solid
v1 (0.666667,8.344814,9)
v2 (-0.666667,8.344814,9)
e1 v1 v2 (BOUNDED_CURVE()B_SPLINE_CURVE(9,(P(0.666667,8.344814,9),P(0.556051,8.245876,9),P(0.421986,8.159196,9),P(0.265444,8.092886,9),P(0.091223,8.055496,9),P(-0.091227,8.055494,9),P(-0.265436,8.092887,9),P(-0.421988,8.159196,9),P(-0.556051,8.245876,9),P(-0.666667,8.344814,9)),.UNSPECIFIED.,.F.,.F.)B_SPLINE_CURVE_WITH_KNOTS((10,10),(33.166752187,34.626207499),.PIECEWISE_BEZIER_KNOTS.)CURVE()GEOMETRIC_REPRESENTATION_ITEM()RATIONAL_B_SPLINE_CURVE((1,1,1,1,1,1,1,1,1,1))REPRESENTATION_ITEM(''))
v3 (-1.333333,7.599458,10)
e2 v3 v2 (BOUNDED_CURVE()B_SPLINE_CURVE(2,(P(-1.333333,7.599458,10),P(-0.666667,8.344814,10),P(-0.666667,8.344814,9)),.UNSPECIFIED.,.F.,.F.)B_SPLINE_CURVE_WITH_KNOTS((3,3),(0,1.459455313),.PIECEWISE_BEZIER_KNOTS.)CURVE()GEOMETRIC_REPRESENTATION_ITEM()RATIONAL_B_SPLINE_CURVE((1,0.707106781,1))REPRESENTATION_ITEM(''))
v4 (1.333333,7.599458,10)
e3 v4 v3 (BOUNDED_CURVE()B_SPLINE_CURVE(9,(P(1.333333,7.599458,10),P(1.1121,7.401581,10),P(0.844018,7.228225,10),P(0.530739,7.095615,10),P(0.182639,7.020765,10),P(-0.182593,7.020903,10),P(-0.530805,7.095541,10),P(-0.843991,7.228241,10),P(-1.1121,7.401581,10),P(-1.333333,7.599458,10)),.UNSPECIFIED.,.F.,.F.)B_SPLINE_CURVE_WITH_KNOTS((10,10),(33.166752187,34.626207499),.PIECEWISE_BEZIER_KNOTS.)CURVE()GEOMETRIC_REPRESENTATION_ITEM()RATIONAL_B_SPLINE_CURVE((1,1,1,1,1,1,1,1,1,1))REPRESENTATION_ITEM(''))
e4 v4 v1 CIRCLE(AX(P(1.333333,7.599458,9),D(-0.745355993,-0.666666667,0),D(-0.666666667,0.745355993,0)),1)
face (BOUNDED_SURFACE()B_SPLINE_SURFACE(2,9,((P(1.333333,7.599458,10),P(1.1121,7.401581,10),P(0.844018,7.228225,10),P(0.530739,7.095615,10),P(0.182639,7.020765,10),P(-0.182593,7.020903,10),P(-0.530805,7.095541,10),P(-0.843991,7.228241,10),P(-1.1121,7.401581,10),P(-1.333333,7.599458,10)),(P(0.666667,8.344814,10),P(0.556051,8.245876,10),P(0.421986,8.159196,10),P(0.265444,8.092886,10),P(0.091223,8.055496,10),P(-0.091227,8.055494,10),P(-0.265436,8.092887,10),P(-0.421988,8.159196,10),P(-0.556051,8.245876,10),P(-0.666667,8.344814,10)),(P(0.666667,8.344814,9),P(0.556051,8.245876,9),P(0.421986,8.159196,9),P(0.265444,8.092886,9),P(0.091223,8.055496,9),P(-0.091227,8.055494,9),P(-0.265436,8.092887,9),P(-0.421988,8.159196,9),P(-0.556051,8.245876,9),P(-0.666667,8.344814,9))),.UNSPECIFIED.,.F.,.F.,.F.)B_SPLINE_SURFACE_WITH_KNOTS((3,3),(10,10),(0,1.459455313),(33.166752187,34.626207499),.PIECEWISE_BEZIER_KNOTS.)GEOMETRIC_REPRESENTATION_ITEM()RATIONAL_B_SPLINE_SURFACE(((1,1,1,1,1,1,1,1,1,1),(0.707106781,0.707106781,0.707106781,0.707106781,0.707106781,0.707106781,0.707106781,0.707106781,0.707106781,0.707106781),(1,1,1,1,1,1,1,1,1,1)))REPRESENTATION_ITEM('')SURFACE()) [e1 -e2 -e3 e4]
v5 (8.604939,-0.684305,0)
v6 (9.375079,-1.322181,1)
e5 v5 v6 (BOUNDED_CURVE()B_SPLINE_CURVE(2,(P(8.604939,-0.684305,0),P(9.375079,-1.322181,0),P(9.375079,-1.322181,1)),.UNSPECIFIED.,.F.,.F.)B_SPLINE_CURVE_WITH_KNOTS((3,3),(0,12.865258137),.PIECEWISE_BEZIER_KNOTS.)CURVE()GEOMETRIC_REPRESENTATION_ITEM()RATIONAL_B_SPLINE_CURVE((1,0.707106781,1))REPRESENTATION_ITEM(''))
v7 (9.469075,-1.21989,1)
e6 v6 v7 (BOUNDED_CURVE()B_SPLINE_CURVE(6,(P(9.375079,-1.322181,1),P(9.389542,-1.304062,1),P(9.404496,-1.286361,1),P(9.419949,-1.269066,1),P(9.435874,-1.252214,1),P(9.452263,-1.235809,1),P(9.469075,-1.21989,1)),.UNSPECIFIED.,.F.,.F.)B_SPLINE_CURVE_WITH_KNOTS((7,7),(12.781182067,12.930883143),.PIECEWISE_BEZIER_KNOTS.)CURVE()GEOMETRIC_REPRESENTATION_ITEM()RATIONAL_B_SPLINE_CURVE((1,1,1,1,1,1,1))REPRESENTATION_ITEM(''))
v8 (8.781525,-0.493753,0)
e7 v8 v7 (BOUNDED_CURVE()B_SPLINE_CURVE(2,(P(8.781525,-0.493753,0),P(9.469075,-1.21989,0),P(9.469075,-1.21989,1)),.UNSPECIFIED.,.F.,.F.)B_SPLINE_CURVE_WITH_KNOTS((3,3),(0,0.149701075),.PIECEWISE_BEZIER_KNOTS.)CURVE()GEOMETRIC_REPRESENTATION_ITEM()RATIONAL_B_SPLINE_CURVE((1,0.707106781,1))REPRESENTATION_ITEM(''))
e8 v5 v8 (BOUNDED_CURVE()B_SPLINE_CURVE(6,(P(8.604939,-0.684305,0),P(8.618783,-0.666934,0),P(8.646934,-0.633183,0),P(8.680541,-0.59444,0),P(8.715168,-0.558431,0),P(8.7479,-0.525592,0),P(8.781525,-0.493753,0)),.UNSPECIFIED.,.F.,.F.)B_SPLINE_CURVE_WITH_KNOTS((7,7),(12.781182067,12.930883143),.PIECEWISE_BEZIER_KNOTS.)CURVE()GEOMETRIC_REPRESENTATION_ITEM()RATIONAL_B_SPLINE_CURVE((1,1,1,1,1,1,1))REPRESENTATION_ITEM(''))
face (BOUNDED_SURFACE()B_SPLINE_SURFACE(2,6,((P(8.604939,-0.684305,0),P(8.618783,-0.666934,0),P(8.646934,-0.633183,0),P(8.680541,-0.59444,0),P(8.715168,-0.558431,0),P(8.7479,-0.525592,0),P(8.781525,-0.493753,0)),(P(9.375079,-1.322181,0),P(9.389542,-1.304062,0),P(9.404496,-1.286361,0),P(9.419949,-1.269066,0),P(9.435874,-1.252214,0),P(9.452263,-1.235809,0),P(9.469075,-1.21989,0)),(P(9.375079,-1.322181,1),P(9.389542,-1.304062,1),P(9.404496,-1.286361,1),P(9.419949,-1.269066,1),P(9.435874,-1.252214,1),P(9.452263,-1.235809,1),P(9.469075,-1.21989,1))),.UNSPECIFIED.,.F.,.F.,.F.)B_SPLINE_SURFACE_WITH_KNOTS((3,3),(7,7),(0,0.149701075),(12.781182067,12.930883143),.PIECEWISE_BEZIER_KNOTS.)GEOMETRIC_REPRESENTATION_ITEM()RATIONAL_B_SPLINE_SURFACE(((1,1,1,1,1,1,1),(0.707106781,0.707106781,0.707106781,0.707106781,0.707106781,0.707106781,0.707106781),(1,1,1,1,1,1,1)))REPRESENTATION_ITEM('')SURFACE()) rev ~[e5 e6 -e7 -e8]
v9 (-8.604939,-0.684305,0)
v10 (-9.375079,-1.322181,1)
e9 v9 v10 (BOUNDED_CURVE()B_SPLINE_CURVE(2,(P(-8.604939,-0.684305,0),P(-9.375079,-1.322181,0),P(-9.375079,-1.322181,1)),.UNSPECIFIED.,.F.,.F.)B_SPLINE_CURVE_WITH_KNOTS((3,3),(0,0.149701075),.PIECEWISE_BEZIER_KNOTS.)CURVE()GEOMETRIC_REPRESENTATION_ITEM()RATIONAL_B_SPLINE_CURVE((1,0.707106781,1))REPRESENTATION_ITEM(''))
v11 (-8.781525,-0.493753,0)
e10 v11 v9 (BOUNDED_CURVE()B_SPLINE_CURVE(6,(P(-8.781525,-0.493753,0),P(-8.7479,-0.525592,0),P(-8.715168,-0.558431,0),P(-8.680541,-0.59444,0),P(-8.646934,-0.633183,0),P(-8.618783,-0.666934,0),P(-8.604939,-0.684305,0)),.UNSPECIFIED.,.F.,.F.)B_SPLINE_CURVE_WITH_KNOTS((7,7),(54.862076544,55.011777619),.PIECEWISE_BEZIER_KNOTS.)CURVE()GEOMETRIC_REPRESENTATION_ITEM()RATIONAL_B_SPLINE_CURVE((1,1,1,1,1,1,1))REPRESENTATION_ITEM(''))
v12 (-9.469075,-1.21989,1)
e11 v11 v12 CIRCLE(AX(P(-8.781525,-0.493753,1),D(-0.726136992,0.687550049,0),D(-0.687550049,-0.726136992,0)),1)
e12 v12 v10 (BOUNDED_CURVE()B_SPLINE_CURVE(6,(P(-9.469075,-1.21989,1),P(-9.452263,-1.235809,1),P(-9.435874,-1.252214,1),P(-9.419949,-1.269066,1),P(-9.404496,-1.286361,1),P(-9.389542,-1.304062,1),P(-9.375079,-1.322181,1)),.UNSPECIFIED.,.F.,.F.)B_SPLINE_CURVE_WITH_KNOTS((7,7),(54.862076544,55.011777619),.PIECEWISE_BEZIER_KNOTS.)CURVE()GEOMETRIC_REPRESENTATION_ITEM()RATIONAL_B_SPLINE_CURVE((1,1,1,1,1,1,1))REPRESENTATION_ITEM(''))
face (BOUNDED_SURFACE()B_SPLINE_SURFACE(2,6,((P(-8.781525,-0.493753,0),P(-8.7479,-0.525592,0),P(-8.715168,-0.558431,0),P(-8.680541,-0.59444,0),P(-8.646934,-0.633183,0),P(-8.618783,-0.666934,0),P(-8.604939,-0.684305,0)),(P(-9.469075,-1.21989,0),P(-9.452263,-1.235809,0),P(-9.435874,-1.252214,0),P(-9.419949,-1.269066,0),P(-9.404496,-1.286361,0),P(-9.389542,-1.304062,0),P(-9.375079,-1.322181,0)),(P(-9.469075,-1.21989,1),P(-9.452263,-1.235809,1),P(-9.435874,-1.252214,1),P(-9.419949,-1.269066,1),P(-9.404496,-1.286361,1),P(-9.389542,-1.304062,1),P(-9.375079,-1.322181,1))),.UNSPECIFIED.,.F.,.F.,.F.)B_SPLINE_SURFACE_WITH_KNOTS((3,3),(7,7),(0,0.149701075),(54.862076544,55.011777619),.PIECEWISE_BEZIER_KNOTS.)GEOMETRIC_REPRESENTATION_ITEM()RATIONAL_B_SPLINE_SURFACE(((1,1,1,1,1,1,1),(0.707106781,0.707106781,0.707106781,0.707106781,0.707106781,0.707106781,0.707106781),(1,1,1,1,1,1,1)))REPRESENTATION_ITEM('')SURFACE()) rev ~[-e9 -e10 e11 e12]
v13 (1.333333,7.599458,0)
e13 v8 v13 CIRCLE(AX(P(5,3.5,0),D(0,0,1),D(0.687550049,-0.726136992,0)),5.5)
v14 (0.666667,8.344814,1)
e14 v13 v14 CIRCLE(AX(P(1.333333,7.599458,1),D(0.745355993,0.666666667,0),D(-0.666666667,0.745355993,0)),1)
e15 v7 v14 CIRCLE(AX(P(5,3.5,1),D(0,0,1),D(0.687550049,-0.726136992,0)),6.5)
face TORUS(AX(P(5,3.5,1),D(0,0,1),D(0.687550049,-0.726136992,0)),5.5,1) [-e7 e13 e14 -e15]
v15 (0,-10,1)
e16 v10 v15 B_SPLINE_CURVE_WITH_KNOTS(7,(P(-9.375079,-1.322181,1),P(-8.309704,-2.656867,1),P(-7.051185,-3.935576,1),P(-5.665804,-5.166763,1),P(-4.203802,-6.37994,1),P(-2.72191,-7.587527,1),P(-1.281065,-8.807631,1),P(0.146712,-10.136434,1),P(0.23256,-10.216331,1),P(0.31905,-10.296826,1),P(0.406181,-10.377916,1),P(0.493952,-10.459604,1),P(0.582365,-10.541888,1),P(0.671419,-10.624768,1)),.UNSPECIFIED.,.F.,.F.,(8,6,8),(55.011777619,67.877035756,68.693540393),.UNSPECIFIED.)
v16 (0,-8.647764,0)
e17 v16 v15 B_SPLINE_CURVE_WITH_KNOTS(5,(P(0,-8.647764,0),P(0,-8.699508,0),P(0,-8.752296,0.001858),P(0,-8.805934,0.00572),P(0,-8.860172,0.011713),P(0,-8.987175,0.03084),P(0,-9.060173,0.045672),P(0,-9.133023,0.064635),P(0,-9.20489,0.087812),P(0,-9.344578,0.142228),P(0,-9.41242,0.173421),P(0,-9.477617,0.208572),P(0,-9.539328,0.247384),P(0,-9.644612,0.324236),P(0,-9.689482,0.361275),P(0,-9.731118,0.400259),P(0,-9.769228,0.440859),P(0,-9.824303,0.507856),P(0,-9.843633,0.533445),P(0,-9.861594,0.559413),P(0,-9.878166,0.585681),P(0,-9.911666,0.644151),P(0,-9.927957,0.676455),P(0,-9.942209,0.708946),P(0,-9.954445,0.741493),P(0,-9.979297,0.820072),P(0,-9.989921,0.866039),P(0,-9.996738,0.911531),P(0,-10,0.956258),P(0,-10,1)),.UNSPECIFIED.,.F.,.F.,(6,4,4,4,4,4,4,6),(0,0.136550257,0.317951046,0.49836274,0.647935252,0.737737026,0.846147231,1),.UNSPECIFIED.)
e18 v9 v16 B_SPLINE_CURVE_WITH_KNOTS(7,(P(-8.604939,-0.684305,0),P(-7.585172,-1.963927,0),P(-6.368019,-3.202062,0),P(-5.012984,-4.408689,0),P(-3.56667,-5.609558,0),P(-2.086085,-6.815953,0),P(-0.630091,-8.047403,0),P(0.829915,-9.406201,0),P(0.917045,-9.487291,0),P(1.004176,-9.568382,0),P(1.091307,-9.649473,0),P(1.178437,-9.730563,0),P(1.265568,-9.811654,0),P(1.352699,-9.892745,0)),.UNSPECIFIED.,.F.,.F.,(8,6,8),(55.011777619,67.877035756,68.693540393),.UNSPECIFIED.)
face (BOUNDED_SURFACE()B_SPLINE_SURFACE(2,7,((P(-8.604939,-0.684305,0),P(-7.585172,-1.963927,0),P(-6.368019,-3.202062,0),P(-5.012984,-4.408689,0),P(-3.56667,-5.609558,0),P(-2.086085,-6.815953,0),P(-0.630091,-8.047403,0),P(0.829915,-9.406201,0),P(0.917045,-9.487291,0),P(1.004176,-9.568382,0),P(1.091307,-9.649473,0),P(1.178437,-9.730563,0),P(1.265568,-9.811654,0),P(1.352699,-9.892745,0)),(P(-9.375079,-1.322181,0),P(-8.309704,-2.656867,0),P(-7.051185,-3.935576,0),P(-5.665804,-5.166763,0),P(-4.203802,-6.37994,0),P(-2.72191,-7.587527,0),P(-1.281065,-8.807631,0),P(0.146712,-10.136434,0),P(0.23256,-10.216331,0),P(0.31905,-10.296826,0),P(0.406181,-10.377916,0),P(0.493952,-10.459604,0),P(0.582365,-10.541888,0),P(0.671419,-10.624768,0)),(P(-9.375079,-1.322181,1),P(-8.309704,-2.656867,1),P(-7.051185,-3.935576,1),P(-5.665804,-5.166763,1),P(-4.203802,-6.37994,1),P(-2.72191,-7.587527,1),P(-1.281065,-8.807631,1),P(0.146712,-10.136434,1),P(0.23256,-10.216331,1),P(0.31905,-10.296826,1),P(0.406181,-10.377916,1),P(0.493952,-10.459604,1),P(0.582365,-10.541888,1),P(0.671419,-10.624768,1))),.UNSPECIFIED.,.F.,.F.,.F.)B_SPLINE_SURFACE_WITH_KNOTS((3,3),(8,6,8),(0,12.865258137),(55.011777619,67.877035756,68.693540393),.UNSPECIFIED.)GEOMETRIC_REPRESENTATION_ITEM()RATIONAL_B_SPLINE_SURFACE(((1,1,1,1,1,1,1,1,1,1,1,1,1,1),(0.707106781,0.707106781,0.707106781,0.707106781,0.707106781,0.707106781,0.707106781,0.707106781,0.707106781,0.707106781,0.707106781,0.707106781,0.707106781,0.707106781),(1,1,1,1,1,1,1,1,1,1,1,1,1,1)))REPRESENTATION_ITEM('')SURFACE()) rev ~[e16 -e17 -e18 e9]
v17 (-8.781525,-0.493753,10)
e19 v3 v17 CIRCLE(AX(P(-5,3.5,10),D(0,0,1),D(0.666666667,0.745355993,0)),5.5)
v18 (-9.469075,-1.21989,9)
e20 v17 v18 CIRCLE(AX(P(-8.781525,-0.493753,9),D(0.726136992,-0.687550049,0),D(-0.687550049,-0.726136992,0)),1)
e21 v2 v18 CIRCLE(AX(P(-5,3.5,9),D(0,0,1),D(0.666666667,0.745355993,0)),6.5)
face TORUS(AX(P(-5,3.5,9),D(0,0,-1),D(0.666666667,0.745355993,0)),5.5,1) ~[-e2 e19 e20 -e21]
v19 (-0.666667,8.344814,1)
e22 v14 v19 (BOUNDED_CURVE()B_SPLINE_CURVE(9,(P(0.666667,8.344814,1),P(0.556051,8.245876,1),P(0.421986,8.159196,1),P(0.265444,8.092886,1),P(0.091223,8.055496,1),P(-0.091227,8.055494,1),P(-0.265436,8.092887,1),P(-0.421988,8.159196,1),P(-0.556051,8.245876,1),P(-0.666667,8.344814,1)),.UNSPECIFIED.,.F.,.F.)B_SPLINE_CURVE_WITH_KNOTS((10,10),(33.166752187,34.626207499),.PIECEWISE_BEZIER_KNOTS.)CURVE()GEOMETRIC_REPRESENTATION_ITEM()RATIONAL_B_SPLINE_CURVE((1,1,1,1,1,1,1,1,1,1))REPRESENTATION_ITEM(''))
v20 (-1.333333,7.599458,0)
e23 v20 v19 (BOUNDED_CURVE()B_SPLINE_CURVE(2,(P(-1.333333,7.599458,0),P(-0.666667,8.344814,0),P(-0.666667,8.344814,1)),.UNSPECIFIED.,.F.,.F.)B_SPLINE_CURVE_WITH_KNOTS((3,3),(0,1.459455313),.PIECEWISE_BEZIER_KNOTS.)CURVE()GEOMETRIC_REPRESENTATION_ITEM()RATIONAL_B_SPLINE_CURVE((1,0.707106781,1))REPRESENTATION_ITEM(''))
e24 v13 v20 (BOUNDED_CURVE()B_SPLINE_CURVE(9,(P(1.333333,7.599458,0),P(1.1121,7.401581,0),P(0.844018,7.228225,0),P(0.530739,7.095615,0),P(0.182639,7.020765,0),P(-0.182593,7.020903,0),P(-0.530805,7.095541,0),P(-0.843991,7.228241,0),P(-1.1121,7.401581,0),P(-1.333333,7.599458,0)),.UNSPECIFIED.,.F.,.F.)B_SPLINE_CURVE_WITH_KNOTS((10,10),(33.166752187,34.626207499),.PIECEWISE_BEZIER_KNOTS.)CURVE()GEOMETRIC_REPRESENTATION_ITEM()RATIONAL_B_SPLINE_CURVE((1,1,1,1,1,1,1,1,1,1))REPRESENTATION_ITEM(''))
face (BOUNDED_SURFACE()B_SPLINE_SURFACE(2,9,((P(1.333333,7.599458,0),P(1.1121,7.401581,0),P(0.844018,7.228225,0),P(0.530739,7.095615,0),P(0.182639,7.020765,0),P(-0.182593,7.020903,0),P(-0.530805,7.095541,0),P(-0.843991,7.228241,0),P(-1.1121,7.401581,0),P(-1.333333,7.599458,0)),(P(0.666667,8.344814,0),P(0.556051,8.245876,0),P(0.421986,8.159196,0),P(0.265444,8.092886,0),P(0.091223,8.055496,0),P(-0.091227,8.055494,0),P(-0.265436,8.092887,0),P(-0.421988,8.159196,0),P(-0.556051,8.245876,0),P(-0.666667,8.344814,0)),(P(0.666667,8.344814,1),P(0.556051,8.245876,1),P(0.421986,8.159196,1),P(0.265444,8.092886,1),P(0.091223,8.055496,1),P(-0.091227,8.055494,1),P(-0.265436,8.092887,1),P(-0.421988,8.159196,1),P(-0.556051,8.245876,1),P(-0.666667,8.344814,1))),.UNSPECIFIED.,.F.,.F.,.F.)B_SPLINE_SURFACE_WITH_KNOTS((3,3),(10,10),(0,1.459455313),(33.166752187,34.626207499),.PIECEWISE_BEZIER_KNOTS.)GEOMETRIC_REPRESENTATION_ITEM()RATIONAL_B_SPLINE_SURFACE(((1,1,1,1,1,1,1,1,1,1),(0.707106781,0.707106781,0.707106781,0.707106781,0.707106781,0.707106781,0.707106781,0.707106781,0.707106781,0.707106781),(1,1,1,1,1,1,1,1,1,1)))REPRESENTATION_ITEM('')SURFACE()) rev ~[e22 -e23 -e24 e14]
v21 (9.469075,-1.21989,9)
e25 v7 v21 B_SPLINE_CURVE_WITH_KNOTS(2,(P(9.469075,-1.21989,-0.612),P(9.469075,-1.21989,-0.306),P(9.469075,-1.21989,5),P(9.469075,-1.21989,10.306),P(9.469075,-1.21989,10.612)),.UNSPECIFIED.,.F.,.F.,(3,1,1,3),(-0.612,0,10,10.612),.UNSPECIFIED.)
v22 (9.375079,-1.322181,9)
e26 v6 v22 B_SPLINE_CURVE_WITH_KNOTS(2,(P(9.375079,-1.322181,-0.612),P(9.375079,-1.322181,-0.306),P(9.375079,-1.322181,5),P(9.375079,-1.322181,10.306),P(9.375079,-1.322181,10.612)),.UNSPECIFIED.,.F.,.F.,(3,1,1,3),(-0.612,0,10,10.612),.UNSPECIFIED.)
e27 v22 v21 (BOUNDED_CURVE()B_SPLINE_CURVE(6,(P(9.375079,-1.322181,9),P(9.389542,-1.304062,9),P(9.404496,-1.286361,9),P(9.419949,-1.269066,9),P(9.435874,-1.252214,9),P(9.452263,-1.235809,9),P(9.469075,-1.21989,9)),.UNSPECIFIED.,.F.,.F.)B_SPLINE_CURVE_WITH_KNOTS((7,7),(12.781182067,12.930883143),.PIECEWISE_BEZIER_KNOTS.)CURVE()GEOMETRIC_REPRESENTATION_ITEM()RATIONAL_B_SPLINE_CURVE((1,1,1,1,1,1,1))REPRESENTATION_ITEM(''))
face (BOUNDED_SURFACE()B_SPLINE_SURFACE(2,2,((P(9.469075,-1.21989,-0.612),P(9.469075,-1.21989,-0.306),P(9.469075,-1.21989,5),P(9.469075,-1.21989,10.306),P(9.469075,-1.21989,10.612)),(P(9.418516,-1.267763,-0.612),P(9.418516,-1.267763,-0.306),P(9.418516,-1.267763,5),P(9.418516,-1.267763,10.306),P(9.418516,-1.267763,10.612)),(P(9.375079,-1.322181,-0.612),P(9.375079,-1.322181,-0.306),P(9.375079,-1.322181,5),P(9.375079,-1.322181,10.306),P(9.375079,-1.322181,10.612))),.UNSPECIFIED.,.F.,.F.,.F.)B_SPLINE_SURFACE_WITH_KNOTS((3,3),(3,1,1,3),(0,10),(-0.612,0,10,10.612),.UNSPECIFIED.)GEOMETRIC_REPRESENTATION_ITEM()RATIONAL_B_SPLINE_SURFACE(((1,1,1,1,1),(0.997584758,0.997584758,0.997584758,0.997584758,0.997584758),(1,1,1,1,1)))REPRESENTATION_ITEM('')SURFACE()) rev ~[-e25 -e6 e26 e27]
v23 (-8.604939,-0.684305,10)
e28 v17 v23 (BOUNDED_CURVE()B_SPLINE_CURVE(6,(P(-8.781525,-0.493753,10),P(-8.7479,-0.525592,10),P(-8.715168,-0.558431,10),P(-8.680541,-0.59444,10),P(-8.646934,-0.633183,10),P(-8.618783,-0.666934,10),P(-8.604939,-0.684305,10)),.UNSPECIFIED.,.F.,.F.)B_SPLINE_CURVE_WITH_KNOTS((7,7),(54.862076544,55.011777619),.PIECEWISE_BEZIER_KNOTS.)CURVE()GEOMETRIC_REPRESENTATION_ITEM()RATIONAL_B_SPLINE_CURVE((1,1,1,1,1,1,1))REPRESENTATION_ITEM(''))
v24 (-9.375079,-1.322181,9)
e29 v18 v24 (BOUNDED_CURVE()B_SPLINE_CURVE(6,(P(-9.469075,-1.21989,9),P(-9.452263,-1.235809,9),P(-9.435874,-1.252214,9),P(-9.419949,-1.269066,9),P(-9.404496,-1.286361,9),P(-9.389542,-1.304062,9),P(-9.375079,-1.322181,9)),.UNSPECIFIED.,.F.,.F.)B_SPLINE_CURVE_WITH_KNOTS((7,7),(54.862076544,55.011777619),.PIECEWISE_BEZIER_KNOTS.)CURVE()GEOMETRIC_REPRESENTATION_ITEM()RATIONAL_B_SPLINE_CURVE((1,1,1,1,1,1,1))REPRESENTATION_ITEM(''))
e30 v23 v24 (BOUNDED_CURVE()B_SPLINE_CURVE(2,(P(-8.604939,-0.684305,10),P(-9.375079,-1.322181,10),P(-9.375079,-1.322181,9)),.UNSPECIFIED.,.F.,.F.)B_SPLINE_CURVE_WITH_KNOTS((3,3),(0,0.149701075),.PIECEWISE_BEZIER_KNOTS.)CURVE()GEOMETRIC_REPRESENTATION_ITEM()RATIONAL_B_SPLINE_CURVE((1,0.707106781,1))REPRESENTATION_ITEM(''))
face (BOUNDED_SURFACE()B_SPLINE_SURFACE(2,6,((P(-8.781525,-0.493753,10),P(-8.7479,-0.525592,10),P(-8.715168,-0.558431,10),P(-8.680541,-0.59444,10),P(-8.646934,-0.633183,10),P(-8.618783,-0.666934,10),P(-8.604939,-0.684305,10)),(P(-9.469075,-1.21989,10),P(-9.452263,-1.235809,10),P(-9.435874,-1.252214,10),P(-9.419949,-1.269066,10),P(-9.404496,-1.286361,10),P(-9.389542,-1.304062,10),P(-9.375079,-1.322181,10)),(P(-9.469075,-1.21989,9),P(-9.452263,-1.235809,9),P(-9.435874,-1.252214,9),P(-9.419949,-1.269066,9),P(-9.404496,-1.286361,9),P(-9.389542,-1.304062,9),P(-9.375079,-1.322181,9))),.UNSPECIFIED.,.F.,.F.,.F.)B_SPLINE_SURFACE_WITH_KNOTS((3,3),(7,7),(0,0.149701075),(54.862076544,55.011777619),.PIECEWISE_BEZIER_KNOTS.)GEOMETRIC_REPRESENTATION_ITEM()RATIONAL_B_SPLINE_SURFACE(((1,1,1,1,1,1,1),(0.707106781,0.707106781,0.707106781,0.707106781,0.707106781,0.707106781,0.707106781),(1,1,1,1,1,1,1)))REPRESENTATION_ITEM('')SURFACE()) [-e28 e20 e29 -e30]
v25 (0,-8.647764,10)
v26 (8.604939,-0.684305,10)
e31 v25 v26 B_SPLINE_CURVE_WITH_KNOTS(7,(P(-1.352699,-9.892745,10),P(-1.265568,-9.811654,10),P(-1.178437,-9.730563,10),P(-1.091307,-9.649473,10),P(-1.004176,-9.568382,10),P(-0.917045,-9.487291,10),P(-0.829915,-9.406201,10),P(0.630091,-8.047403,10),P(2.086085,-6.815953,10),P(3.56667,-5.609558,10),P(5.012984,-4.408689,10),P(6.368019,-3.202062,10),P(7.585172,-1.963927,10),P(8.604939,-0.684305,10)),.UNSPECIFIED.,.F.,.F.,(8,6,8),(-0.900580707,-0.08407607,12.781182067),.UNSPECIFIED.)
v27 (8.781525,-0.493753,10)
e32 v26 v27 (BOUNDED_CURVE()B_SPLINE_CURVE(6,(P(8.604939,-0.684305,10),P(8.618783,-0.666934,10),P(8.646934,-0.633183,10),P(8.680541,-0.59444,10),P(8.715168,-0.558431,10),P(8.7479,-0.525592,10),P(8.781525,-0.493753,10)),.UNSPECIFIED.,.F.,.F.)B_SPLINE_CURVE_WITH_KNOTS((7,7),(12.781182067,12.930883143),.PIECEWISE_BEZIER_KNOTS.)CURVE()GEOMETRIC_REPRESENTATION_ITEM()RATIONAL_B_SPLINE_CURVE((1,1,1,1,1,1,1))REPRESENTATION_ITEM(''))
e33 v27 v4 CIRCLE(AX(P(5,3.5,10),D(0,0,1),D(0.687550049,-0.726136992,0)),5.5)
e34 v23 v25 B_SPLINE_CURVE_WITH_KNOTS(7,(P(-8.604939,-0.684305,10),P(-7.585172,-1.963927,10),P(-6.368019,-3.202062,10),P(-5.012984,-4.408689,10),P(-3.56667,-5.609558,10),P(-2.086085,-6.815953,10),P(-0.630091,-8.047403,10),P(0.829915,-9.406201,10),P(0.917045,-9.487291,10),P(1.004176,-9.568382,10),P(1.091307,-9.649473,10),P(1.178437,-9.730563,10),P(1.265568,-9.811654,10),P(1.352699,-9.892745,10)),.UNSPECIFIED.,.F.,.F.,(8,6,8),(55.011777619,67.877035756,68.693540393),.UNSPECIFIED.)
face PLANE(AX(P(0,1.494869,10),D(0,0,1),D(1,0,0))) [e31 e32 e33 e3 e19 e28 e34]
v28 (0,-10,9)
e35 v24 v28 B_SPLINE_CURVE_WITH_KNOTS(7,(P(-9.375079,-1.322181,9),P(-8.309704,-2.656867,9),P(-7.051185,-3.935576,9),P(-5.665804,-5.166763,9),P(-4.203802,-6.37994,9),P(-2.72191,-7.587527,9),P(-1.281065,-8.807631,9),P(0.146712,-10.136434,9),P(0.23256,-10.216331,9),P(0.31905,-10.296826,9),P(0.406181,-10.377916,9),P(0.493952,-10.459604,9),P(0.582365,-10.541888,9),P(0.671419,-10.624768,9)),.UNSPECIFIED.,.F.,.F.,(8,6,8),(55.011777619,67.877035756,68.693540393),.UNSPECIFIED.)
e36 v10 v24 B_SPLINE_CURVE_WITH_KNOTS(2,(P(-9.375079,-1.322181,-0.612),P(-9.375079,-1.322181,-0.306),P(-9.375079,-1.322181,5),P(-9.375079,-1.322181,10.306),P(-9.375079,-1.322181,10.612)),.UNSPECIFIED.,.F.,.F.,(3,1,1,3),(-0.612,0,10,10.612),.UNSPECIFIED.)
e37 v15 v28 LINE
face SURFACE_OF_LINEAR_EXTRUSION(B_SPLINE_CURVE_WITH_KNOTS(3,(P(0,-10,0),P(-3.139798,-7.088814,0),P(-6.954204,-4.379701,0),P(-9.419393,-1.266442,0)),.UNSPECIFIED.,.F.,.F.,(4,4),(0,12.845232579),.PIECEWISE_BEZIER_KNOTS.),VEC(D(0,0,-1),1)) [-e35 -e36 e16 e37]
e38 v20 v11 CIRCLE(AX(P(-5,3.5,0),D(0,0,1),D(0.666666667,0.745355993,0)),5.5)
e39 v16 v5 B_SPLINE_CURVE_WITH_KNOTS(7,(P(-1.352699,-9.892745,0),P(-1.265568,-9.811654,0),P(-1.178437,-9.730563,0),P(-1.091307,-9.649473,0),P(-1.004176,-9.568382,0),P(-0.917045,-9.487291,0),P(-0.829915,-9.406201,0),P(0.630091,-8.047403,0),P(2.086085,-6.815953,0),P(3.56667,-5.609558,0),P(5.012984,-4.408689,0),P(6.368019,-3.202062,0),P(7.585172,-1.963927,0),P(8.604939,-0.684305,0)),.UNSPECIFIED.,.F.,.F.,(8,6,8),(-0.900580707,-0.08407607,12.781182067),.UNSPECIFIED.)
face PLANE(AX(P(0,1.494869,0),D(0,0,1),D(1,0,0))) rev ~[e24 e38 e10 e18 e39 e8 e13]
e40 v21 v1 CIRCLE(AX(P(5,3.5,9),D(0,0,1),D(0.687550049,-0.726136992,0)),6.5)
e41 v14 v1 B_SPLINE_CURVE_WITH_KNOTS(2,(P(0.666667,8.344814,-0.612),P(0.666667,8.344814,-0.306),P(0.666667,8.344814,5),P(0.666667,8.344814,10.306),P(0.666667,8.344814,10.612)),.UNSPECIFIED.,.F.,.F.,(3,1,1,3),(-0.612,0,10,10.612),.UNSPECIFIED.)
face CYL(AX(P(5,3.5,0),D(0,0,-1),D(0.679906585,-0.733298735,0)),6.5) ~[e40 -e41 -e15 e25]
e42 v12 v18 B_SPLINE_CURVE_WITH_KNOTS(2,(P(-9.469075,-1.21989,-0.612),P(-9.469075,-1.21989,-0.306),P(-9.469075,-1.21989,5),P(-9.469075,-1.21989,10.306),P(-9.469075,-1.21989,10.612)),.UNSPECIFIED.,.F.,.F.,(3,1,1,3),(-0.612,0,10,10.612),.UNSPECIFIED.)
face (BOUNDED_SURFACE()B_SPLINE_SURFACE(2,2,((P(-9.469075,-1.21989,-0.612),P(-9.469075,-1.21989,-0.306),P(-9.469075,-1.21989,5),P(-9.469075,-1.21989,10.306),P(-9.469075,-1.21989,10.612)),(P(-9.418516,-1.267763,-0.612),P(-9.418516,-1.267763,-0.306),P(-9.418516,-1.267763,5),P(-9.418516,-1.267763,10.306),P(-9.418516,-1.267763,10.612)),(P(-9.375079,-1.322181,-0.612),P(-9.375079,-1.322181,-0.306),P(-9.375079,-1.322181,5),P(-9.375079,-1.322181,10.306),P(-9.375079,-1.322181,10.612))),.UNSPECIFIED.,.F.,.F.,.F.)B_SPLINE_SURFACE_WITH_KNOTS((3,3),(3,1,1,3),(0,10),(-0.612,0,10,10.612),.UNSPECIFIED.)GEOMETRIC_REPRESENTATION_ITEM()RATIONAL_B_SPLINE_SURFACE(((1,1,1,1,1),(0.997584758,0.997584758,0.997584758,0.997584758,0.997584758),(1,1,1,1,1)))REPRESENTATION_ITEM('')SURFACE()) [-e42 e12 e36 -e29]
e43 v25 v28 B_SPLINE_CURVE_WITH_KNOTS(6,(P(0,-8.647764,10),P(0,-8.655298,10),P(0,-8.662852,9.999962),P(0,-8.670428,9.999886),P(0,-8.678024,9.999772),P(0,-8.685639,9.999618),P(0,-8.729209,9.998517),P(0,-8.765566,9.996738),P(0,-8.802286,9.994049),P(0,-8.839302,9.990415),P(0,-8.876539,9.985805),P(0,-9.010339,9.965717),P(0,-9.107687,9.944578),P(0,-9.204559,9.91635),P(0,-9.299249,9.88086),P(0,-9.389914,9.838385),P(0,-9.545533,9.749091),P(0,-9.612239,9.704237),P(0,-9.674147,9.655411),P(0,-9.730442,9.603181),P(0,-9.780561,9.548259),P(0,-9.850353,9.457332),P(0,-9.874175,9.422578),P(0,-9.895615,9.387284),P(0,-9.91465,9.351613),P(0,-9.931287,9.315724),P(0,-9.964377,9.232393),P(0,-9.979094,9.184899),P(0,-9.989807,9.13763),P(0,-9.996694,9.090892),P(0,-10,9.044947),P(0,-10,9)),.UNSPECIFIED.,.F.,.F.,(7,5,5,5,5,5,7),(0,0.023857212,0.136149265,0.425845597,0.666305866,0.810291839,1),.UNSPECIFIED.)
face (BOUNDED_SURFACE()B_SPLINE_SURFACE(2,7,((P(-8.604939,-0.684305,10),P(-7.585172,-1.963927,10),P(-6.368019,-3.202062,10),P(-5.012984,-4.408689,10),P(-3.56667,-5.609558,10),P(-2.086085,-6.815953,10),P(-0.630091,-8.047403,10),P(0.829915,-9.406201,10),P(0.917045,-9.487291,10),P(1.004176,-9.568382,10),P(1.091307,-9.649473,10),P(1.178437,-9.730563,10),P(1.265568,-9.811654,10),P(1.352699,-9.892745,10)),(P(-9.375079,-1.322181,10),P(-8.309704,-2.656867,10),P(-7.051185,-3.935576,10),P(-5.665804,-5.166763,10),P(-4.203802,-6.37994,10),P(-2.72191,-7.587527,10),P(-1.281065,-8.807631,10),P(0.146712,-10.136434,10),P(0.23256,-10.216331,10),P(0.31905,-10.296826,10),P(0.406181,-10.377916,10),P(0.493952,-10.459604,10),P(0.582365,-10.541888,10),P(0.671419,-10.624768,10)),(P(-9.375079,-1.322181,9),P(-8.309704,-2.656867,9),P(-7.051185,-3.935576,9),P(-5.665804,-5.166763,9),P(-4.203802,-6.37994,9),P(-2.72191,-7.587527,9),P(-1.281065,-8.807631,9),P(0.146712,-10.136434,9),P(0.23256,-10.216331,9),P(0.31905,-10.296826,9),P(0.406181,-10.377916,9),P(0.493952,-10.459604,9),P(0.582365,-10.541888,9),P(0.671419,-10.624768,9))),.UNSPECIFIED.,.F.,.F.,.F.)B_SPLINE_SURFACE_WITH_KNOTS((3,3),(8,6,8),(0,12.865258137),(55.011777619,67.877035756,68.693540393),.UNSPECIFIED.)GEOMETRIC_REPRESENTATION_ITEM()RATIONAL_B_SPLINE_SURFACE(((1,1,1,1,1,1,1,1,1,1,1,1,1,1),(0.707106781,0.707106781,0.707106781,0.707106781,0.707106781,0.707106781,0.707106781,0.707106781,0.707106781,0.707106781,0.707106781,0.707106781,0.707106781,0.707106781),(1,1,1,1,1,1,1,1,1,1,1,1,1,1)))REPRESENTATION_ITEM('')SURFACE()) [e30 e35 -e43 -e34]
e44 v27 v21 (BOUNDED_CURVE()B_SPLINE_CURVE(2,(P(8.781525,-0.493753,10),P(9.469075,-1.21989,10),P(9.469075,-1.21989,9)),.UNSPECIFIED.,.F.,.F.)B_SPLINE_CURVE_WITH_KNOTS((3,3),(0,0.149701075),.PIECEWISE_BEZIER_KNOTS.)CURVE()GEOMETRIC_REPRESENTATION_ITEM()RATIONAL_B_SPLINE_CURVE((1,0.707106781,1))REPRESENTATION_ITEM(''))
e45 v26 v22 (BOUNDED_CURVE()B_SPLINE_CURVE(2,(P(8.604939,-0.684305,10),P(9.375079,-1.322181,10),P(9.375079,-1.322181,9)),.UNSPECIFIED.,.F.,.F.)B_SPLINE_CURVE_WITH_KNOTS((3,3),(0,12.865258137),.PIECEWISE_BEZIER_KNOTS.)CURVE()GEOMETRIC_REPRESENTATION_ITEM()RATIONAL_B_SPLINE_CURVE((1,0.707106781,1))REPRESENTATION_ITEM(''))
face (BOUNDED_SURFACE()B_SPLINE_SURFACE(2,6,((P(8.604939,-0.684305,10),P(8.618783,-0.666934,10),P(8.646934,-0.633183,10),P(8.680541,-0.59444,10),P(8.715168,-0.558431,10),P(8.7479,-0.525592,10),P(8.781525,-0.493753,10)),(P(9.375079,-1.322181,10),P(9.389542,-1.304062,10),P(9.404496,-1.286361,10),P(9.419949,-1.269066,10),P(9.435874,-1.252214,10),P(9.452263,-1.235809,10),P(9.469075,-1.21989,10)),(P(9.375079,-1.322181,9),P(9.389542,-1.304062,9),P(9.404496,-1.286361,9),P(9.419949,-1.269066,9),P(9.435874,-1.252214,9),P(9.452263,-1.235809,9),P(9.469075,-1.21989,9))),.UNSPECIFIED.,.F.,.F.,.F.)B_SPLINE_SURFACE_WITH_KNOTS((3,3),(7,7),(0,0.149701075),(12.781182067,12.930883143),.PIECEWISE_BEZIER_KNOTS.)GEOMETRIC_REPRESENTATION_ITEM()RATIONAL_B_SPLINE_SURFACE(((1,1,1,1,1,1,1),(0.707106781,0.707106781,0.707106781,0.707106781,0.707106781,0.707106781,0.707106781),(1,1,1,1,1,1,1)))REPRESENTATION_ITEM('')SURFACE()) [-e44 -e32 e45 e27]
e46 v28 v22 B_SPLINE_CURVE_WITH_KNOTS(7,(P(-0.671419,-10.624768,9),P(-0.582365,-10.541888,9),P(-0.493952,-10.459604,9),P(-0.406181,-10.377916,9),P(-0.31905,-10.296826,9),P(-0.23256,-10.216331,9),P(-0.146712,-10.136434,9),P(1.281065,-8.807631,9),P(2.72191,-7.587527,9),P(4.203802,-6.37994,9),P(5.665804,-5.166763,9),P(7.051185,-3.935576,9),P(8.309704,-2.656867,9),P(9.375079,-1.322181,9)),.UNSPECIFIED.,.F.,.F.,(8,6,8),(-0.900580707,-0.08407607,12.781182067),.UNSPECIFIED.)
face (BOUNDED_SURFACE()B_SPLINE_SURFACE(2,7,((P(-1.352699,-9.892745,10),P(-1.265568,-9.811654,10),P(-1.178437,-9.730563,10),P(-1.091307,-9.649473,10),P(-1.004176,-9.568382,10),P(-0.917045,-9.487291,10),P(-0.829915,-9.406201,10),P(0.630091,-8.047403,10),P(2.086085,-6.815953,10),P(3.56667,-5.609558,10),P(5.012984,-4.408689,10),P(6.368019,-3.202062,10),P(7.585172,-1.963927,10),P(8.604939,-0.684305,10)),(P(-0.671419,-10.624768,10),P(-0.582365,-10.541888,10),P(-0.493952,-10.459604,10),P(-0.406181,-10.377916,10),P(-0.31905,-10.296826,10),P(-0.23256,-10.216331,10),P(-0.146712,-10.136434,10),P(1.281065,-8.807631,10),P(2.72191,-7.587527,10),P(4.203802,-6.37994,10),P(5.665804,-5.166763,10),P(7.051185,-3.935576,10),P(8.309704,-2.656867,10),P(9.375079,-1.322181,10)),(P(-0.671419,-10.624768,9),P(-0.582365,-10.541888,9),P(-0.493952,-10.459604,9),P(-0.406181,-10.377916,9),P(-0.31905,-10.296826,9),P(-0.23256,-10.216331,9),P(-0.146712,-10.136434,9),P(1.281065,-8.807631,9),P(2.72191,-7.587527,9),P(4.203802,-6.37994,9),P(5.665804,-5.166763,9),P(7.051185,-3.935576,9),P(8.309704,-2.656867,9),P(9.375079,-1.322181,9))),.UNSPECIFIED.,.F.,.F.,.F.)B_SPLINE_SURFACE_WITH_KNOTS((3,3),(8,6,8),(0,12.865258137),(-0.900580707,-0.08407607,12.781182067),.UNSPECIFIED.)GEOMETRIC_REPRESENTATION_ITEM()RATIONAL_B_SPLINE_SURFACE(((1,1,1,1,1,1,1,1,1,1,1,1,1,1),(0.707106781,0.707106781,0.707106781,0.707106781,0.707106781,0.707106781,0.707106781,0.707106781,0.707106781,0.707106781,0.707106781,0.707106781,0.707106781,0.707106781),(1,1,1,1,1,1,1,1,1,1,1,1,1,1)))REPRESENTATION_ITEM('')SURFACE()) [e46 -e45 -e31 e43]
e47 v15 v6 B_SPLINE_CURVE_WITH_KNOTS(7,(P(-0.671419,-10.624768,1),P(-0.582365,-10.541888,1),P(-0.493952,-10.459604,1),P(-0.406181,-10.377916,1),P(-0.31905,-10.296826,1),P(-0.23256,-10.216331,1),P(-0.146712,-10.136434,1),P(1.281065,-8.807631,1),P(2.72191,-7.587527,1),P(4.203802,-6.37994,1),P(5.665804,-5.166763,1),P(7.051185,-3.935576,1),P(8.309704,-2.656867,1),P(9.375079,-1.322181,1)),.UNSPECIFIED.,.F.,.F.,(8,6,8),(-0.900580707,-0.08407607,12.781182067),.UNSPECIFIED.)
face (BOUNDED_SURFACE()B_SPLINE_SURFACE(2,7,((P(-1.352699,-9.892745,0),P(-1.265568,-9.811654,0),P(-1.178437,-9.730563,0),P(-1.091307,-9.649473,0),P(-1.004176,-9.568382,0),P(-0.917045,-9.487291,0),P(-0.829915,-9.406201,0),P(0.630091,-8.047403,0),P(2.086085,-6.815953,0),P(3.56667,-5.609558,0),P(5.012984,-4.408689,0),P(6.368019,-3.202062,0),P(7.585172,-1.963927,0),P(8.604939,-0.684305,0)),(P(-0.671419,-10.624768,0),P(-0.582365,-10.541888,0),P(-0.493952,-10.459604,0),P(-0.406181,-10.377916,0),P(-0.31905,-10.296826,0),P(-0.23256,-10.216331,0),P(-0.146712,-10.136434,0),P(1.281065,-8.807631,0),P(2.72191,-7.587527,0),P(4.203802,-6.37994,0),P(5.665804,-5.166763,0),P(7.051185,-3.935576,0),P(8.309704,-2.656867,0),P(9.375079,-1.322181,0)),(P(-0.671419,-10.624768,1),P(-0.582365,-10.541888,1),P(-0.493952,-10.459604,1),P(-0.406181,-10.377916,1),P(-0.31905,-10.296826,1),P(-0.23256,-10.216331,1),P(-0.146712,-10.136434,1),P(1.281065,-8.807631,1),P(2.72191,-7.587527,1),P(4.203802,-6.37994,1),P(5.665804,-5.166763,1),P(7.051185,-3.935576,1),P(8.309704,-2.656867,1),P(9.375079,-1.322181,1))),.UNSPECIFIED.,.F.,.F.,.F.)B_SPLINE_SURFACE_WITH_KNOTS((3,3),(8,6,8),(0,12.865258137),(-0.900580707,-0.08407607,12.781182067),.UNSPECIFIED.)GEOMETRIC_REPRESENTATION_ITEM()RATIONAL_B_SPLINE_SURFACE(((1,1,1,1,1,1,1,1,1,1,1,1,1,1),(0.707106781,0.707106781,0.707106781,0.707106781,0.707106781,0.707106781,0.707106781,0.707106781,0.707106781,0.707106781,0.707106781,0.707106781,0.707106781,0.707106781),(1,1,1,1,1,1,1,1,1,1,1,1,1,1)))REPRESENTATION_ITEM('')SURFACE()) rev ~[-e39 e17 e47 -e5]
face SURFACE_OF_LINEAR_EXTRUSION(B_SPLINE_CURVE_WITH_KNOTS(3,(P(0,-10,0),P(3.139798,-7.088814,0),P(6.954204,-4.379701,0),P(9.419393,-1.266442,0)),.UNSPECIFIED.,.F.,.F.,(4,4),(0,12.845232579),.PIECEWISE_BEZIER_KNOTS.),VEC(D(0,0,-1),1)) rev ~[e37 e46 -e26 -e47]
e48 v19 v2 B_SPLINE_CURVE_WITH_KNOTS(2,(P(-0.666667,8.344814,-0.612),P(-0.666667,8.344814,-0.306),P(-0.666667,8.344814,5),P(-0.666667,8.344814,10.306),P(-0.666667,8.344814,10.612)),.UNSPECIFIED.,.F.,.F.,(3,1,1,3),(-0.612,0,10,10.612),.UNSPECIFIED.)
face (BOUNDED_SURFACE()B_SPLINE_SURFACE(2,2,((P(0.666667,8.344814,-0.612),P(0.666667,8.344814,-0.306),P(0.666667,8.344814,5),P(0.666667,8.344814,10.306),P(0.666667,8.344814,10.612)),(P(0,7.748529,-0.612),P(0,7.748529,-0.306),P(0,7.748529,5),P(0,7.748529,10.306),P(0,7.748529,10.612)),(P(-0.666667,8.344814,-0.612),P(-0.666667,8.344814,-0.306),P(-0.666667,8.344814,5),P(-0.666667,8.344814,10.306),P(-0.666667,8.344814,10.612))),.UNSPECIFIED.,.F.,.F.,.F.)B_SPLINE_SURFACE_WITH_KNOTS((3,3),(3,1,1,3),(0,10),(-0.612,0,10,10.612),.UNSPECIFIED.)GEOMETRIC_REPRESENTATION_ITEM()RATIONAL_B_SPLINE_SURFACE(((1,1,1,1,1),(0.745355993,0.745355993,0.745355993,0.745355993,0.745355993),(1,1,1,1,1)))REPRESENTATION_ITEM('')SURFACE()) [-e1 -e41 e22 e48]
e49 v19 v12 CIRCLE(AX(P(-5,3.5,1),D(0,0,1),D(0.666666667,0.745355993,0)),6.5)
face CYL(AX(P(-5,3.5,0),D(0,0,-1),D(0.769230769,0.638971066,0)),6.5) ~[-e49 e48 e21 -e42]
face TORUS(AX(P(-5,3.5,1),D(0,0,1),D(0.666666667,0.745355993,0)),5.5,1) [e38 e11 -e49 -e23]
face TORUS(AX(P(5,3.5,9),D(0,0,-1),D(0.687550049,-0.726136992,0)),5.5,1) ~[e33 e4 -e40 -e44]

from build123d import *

# Parameters (mm, degrees)
F1_DEPTH = 10
F2_F1_R  = 1
F2_F2_R  = 1


with BuildPart() as f1:
    # F0 (on Top) → F1 (new body)
    with BuildSketch(Plane.XY):
        with BuildLine():
            ThreePointArc((9.4193928047, -1.2664417795), (9.4693151315, 8.2196633625), (0, 7.6533119315))
            ThreePointArc((0, 7.6533119315), (-9.4693151315, 8.2196633625), (-9.4193928047, -1.2664417795))
            add(Edge.make_bspline(
                [(0, -10), (-3.1397976016, -7.0888139265), (-6.9542042911, -4.3797008693), (-9.4193928047, -1.2664417795)],
                knots=[0, 0, 0, 0, 12.8452325787, 12.8452325787, 12.8452325787, 12.8452325787], degree=3))
            add(Edge.make_bspline(
                [(0, -10), (3.1397976016, -7.0888139265), (6.9542042911, -4.3797008693), (9.4193928047, -1.2664417795)],
                knots=[0, 0, 0, 0, 12.8452325787, 12.8452325787, 12.8452325787, 12.8452325787], degree=3))
        make_face()
    extrude(amount=F1_DEPTH)

    # F2: fillet of radius 1 on 7 edges, made by hand

    # F2_f1
    f2_f1_edges = [f1.edges().sort_by_distance(p)[0] for p in [
        (0, 7.6533119315, 5),
        (-9.4193928047, -1.2664417795, 5),
        (9.4193928047, -1.2664417795, 5),
    ]]
    fillet(f2_f1_edges, radius=F2_F1_R)

    # F2_f2
    f2_f2_edges = [f1.edges().sort_by_distance(p)[0] for p in [
        (-9.7828337858, 7.9016475299, 0),
        (-9.7828337858, 7.9016475299, 10),
        (9.7828337858, 7.9016475299, 0),
        (9.7828337858, 7.9016475299, 10),
        (9.4202986519, -1.2694012696, 10),
        (1e-10, 8.0901699416, 10),
        (9.4202986519, -1.2694012696, 0),
        (1e-10, 8.0901699416, 0),
        (-9.4202986519, -1.2694012696, 10),
        (-9.4202986519, -1.2694012696, 0),
    ]]
    fillet(f2_f2_edges, radius=F2_F2_R)


solid = f1.part
